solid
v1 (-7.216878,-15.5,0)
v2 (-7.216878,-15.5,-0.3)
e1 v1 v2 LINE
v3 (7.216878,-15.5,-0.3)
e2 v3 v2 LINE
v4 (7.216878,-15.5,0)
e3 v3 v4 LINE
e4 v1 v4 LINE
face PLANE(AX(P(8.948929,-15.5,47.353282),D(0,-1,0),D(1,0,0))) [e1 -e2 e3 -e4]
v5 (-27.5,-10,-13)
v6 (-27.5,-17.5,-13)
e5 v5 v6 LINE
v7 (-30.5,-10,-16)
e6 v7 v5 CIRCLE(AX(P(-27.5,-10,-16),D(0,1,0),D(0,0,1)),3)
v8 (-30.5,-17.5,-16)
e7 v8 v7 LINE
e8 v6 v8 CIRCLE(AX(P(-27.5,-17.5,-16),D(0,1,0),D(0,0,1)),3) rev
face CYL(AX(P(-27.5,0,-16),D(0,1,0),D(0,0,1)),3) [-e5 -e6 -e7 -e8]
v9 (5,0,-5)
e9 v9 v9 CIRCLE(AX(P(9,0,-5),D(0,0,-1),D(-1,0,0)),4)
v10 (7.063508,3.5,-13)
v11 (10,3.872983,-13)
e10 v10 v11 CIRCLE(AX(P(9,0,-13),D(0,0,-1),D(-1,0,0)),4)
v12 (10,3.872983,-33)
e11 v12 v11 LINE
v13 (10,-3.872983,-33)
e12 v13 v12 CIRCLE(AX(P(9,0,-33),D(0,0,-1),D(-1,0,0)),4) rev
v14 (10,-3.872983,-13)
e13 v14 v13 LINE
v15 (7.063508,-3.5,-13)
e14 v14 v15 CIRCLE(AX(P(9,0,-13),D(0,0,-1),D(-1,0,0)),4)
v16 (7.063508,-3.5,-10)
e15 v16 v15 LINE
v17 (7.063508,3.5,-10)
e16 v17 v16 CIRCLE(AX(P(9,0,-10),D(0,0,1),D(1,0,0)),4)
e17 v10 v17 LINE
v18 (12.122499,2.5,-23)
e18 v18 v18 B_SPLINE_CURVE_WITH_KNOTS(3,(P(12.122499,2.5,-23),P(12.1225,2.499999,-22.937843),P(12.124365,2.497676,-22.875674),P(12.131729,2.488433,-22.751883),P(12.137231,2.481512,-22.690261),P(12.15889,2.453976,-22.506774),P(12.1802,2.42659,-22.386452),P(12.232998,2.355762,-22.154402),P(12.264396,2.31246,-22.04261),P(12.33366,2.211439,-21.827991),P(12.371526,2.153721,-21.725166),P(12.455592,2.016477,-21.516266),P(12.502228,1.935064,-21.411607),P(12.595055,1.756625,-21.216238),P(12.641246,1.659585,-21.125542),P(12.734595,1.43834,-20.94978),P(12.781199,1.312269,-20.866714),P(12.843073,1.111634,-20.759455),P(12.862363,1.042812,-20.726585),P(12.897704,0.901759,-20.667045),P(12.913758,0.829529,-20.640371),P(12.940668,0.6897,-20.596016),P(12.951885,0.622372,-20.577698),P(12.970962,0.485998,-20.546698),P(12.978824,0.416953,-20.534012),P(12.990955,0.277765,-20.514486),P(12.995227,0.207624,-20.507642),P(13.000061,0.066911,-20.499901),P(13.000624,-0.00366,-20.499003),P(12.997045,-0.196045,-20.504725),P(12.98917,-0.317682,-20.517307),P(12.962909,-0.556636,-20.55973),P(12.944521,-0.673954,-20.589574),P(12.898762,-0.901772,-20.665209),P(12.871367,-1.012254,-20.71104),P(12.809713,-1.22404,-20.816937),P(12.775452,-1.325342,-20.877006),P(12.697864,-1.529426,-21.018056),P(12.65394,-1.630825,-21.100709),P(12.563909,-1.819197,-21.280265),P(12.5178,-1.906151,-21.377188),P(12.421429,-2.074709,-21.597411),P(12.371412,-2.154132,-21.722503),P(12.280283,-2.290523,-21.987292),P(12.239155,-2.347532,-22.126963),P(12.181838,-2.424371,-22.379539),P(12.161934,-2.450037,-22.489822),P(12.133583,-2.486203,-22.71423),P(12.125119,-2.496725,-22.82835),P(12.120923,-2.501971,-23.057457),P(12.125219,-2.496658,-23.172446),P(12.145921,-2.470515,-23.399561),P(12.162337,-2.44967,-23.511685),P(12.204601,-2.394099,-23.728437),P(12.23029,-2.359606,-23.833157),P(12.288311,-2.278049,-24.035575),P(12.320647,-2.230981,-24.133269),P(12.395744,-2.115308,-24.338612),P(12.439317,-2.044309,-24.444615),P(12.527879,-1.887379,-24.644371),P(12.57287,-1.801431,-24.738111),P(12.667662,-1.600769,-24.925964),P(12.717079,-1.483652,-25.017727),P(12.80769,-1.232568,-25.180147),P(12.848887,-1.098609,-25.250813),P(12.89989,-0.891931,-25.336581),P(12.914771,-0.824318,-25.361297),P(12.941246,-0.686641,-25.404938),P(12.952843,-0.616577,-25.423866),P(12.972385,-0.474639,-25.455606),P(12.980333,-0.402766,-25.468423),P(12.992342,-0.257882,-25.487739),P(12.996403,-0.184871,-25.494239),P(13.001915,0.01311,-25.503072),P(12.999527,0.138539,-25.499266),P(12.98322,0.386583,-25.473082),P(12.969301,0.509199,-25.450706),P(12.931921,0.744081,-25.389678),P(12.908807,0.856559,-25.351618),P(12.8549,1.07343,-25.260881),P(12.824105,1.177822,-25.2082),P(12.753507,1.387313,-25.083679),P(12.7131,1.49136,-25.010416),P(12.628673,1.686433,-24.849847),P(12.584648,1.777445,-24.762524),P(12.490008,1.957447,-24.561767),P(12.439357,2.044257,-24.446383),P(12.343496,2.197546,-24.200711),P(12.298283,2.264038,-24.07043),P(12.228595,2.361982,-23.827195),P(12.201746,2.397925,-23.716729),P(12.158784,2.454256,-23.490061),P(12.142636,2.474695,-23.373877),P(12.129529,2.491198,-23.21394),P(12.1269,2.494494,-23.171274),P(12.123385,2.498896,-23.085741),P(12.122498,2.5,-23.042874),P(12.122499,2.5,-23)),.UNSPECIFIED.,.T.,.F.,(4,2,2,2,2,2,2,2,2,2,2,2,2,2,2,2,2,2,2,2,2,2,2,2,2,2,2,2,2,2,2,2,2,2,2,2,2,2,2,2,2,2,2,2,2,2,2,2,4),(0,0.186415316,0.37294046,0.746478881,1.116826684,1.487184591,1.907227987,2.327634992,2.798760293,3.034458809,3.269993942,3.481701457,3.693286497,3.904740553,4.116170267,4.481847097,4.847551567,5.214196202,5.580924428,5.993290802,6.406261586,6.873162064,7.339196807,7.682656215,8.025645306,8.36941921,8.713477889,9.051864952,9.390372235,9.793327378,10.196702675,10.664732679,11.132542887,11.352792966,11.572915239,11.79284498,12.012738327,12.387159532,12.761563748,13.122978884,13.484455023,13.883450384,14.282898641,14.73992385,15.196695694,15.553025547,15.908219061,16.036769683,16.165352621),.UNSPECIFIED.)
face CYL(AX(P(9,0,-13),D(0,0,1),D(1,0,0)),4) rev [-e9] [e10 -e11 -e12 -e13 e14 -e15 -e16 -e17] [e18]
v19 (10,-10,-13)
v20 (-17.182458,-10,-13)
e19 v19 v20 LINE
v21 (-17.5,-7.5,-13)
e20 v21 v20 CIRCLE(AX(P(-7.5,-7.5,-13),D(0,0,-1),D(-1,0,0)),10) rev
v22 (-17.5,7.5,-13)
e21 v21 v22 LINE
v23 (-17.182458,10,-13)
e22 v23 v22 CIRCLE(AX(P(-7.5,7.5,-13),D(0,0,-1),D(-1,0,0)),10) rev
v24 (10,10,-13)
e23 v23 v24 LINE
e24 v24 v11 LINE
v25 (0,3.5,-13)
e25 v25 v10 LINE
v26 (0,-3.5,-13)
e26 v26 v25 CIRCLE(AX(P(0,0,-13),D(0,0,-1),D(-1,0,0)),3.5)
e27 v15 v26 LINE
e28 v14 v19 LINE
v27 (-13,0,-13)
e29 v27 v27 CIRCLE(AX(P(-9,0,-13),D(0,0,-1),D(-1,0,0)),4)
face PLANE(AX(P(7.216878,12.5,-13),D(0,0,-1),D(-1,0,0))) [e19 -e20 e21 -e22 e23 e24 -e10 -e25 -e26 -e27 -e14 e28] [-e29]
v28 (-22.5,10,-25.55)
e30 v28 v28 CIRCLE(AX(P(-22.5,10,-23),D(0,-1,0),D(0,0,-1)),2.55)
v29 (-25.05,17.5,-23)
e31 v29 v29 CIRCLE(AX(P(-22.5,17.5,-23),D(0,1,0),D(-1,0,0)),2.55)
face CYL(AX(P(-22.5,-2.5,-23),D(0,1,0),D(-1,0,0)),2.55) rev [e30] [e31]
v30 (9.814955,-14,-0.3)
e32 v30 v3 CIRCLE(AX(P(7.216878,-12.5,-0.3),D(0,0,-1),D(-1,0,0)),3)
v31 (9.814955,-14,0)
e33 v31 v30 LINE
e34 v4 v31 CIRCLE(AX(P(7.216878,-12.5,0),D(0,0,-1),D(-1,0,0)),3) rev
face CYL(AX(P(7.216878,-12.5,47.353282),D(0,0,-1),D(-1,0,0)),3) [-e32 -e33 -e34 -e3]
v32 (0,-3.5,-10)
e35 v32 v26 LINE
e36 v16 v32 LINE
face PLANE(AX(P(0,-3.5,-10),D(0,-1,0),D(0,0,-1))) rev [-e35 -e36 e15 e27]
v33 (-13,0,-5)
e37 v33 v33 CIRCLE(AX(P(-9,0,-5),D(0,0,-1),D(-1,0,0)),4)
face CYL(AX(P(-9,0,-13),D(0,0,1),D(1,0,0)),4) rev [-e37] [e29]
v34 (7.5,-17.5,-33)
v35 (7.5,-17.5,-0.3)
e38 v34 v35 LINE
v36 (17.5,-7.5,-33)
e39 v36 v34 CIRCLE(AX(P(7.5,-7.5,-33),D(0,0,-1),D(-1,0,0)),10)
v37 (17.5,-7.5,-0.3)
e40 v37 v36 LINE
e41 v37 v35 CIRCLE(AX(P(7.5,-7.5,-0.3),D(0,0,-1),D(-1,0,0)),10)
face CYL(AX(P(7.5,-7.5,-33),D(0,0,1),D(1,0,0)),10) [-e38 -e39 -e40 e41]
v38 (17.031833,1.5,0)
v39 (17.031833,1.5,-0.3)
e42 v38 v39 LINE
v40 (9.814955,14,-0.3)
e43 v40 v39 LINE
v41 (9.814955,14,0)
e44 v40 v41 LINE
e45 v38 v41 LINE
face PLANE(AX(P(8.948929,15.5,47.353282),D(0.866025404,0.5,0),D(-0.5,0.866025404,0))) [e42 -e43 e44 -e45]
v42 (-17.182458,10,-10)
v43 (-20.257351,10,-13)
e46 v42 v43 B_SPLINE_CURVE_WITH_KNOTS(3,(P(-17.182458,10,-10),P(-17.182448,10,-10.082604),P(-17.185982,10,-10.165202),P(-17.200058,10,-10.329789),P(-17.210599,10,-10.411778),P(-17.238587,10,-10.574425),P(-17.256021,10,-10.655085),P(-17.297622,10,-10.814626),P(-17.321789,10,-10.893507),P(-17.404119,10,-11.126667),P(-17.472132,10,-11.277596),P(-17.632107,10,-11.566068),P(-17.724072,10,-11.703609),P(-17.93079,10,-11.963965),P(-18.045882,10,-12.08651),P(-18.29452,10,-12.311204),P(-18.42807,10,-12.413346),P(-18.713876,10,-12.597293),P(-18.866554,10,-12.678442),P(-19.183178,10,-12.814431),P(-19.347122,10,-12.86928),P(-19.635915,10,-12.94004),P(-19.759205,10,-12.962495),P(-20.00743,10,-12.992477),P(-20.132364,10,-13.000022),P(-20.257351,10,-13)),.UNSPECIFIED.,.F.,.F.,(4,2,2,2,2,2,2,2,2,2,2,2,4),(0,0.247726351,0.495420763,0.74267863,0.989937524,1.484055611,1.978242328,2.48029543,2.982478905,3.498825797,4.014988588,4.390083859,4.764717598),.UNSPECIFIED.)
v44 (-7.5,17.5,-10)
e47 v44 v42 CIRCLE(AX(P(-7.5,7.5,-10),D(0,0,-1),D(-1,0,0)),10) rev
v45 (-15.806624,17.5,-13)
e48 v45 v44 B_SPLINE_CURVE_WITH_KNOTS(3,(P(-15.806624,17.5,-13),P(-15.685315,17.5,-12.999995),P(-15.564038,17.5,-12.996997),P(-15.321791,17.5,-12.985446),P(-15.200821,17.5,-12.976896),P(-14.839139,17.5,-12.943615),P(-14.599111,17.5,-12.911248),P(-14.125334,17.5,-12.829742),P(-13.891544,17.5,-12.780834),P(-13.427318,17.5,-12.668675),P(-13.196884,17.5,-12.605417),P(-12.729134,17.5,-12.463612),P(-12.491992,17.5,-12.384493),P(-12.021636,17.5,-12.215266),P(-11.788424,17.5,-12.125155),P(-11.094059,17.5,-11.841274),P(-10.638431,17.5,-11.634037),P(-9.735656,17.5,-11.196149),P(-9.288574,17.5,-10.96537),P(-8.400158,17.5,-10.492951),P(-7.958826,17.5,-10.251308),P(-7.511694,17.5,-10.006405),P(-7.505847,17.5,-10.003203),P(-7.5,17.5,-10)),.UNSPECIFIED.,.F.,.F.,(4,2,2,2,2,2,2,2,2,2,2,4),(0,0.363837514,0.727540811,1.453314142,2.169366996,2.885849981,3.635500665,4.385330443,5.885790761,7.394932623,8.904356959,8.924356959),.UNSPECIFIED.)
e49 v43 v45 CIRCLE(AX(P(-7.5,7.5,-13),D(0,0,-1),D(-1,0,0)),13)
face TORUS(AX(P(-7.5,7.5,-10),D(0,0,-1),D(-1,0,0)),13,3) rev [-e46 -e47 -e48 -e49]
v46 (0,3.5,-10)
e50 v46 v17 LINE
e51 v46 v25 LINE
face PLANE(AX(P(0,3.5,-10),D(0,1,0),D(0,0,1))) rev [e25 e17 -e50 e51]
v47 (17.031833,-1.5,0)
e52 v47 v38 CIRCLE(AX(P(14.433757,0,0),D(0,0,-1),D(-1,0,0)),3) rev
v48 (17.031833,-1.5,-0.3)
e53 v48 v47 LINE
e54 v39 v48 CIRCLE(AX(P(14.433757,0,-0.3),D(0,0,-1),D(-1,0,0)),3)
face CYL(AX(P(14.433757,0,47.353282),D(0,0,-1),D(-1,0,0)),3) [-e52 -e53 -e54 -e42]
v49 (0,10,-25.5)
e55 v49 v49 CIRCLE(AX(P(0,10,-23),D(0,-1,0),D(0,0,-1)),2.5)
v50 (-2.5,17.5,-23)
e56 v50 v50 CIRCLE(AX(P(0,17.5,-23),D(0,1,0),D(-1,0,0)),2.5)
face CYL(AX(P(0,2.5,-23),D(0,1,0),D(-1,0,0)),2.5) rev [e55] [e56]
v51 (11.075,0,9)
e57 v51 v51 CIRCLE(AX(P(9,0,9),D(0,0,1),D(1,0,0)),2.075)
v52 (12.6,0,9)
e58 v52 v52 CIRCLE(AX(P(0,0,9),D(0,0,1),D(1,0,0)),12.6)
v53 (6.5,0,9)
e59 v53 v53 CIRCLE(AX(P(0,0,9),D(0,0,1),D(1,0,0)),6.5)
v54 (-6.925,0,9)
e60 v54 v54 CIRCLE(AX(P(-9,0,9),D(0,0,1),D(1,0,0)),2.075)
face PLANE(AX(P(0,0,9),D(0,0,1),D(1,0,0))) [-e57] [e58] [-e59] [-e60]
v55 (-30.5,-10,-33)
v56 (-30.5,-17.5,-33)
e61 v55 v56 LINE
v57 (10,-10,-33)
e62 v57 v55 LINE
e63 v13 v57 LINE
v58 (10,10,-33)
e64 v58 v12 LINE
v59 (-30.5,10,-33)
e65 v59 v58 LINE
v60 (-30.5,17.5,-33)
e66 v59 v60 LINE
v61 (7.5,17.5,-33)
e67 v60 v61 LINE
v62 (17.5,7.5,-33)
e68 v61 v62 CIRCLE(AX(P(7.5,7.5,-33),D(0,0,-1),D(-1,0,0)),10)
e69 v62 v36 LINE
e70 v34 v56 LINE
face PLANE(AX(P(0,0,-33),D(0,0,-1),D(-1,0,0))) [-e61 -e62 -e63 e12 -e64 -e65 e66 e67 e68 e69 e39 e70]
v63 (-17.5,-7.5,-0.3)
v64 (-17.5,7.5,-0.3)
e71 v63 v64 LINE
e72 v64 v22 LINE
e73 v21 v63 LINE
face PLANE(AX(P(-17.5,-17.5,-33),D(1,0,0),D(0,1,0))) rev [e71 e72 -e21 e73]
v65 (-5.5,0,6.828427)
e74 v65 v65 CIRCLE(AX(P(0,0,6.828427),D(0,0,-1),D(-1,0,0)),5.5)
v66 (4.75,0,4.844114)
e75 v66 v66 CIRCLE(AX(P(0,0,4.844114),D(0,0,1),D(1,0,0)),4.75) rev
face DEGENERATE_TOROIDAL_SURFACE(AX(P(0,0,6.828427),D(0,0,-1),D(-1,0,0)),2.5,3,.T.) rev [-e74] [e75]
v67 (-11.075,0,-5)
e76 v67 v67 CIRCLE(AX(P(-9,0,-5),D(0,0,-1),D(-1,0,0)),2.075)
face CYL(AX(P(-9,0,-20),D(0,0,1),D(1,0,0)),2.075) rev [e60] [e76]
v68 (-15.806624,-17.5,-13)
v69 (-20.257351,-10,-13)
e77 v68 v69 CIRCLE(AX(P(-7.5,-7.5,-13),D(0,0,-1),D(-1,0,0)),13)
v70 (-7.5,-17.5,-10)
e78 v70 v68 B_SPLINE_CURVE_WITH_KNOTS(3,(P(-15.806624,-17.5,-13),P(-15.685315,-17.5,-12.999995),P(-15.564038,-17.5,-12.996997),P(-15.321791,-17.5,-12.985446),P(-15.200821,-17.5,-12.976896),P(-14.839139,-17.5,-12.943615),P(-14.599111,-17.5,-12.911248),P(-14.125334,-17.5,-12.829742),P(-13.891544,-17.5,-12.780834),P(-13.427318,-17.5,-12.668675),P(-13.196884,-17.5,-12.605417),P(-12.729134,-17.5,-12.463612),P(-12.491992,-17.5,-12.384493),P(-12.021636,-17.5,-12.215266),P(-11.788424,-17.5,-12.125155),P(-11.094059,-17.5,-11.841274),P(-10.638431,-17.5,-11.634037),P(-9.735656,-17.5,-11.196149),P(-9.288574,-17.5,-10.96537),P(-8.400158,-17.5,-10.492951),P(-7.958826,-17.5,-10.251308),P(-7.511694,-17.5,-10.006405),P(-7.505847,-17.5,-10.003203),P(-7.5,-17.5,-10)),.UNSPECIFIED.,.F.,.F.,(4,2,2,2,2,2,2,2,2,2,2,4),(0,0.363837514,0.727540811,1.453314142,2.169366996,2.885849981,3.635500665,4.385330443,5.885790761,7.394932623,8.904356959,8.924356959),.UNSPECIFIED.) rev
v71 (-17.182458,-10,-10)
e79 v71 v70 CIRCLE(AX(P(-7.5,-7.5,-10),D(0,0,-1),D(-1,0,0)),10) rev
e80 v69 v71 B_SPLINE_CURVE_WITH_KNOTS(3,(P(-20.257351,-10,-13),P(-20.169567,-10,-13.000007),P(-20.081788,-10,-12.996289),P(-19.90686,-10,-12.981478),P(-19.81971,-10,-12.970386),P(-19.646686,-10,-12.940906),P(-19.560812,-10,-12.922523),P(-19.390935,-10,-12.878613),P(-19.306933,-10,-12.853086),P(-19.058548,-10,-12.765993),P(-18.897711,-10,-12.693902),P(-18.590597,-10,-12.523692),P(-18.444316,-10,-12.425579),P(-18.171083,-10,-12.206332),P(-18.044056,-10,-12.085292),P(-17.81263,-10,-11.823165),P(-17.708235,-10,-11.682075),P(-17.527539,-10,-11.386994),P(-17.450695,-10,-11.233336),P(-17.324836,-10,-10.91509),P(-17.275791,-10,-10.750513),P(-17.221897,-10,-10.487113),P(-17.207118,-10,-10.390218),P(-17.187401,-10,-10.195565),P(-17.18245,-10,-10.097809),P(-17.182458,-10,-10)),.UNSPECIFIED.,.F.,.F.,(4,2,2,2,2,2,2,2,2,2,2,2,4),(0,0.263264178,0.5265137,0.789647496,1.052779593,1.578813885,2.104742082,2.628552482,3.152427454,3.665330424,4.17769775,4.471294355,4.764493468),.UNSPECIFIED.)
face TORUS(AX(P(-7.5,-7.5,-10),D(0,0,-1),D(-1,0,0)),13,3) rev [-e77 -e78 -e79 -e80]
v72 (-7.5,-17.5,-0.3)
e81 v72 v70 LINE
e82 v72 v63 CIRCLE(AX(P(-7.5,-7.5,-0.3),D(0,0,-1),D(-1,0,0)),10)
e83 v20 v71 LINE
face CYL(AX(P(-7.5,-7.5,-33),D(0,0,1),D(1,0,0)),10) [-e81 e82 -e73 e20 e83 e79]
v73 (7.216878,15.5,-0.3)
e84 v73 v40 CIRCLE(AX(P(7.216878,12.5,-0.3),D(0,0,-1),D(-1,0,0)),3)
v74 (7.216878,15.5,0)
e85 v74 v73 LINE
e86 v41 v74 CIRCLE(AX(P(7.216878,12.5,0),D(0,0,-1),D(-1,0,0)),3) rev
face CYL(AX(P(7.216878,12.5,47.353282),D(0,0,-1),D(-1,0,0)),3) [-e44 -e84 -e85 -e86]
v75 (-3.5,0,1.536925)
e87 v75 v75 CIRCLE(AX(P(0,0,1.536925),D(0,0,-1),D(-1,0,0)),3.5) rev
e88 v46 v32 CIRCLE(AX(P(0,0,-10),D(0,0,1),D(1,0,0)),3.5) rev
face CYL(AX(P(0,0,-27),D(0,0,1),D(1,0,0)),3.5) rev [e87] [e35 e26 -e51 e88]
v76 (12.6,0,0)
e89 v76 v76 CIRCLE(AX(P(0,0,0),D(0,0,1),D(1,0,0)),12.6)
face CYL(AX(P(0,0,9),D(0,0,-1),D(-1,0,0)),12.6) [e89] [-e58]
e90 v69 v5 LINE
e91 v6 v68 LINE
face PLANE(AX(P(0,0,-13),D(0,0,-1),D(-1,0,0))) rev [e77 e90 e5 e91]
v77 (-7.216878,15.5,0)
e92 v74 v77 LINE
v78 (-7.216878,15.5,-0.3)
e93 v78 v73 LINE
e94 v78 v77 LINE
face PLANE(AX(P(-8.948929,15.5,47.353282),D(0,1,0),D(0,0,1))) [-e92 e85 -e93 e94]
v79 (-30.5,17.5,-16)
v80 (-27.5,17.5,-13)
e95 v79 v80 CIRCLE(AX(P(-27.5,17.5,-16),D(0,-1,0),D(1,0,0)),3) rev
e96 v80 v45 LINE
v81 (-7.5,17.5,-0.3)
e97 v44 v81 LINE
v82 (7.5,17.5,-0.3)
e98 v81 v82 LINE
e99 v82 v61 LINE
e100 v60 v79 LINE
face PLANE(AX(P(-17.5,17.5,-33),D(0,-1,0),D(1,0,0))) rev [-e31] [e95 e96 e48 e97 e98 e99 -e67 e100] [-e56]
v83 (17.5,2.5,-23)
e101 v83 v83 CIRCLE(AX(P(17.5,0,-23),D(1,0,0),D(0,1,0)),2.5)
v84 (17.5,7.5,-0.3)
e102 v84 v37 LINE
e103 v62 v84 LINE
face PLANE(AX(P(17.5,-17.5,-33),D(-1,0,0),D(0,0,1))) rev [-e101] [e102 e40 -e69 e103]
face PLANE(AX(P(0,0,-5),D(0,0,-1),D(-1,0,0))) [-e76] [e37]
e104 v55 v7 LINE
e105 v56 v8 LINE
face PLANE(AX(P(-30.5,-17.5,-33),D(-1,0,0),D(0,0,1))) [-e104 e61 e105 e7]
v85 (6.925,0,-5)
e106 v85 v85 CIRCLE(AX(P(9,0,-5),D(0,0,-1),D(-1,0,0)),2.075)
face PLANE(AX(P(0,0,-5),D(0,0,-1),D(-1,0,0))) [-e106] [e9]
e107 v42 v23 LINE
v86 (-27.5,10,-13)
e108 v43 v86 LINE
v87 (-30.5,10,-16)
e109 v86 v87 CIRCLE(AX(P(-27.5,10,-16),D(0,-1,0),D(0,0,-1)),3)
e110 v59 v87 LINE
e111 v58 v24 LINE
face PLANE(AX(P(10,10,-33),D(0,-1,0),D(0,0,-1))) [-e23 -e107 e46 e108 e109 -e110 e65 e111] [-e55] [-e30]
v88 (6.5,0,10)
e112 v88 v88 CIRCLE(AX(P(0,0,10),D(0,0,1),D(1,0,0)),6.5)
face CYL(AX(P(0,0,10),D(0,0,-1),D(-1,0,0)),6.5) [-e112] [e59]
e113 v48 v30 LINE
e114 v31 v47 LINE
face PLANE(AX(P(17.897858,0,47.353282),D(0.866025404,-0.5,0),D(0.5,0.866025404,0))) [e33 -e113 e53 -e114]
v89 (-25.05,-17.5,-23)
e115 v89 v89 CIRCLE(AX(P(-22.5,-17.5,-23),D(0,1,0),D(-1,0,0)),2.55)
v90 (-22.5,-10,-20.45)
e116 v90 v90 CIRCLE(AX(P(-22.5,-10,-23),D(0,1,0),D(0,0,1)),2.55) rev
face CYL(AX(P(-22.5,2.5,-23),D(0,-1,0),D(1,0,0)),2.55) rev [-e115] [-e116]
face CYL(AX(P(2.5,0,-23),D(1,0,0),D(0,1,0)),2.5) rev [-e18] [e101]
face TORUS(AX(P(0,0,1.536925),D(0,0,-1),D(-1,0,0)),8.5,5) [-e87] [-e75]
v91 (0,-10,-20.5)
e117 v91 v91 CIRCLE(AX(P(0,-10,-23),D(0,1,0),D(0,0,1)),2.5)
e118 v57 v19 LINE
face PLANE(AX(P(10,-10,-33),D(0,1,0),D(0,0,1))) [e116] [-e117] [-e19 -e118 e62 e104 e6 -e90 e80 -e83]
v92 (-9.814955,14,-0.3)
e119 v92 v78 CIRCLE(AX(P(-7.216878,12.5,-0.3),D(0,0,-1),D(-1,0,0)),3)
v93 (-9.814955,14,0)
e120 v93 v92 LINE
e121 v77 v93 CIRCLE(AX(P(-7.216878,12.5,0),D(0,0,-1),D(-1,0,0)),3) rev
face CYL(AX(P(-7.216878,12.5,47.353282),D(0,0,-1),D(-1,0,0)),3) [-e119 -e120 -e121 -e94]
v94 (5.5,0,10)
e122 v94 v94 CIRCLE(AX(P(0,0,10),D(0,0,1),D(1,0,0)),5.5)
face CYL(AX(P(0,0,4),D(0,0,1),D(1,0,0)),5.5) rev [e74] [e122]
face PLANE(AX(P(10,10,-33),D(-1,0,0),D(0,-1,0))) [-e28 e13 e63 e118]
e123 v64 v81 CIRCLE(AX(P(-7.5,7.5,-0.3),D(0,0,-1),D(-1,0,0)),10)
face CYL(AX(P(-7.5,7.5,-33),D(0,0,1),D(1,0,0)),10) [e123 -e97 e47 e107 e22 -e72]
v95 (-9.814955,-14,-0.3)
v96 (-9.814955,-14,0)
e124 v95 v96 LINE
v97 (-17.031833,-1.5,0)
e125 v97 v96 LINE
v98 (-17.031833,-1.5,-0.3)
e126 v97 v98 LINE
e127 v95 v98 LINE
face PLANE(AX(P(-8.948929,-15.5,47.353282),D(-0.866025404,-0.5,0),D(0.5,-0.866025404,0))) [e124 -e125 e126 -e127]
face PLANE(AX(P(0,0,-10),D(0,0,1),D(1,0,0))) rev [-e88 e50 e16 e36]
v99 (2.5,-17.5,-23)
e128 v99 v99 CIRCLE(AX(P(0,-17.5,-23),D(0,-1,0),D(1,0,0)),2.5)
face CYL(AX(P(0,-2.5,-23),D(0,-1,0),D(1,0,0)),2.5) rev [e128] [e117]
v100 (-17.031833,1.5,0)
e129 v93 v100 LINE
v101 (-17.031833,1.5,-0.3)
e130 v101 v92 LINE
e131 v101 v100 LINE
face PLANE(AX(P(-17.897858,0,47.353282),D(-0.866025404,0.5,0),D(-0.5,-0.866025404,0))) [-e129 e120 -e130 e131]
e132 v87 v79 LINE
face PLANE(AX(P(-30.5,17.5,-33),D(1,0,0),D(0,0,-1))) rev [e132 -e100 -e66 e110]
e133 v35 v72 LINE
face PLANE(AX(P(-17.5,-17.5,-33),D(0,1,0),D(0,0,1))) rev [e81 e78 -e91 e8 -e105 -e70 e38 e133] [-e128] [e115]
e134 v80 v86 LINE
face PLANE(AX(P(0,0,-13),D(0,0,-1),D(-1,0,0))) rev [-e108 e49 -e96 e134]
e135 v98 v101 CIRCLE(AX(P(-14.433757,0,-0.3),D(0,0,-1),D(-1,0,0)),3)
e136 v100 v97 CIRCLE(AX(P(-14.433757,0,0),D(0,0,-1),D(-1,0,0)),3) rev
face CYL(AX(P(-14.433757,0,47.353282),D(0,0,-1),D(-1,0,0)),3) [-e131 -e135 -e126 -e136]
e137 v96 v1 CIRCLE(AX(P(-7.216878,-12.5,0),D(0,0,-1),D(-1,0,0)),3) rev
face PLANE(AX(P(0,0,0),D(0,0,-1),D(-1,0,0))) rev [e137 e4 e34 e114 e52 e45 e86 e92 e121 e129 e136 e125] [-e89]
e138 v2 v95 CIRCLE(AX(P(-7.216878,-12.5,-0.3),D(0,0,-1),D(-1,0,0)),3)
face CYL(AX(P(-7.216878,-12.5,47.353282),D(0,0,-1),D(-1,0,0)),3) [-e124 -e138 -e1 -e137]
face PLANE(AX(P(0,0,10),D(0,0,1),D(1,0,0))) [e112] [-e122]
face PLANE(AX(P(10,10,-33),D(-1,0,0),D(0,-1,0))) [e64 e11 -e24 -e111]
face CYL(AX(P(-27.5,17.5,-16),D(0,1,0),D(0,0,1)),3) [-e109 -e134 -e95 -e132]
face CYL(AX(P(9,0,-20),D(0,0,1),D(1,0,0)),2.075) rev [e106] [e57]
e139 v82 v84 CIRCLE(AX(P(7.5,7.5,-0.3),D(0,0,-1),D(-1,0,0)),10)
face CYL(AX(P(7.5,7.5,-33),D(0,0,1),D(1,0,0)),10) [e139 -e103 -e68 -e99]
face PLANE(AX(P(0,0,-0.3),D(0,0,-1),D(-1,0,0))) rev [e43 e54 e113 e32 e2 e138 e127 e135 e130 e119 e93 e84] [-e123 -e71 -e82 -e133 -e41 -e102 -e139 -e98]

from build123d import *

# Parameters (mm, degrees)
SKETCH_1_R               = 12.6
EXTRUDE_1_DEPTH          = 9
SKETCH_2_R               = 15
EXTRUDE_2_DEPTH          = 5
SKETCH_3_R               = 5.5
CUT_EXTRUDE_1_DEPTH      = 5
SKETCH_4_R               = 2.075
CUT_EXTRUDE_2_DEPTH      = 29
SKETCH_5_R               = 3.5
CUT_EXTRUDE_3_DEPTH      = 31
FILLET_1_R               = 3
FILLET_2_R               = 5
EXTRUDE_START            = 1
SKETCH_6_R               = 6.5
SKETCH_6_R_2             = 5.5
EXTRUDE_1_2_DEPTH        = 1
EXTRUDE_START_2          = -5
SKETCH_7_R               = 15
EXTRUDE_3_DEPTH          = 5
FILLET_3_R               = 3
EXTRUDE_START_3          = 8
SKETCH_8_R               = 3.5
SKETCH_8_R_2             = 4
EXTRUDE_4_DEPTH          = 8
SKETCH_9_W               = 35
SKETCH_9_H               = 35
SKETCH_9_W_2             = 20
SKETCH_9_H_2             = 20
EXTRUDE_5_DEPTH          = 20
SKETCH_10_W              = 35
SKETCH_10_H              = 35
EXTRUDE_6_DEPTH          = 8.5
FILLET_4_R               = 10
SKETCH_11_R              = 2.5
CUT_EXTRUDE_4_DEPTH      = 15
PATTERN_CIRCULAR_1_COUNT = 4
CUT_EXTRUDE_START        = 83
SKETCH_12_R              = 4
CUT_EXTRUDE_5_DEPTH      = 83
SKETCH_14_W              = 23.212780374
SKETCH_14_H              = 20
CUT_EXTRUDE_6_DEPTH      = 41
EXTRUDE_7_DEPTH          = 1.3
SKETCH_16_W              = 9.986830102
SKETCH_16_H              = 7
CUT_EXTRUDE_7_DEPTH      = 3
SKETCH_18_W              = 23
SKETCH_18_H              = 7.5
EXTRUDE_8_DEPTH          = 20
SKETCH_19_R              = 2.55
CUT_EXTRUDE_8_DEPTH      = 20
FILLET_8_R               = 3
FILLET_9_R               = 3
EXTRUDE_9_DEPTH          = 2.9


with BuildPart() as part:
    # 草图1 → Extrude 1 (new body)
    with BuildSketch(Plane.XY):
        Circle(SKETCH_1_R)
    extrude(amount=EXTRUDE_1_DEPTH)

    # 草图2 → 凸台-拉伸2 (add)
    with BuildSketch(Plane(origin=(0, 0, 0), x_dir=(-1, 0, 0), z_dir=(0, 0, -1))):
        Circle(SKETCH_2_R)
    extrude(amount=EXTRUDE_2_DEPTH)

    # 草图3 → Cut-Extrude 1 (cut)
    with BuildSketch(Plane.XY.offset(9)):
        Circle(SKETCH_3_R)
    extrude(amount=-CUT_EXTRUDE_1_DEPTH, mode=Mode.SUBTRACT)

    # 草图4 → 切除-拉伸2 (cut)
    with BuildSketch(Plane.XY.offset(9)):
        with Locations((-9, 0)):
            Circle(SKETCH_4_R)
        with Locations((9, 0)):
            Circle(SKETCH_4_R)
    extrude(amount=-CUT_EXTRUDE_2_DEPTH, mode=Mode.SUBTRACT)

    # 草图5 → 切除-拉伸3 (cut)
    with BuildSketch(Plane.XY.offset(4)):
        Circle(SKETCH_5_R)
    extrude(amount=-CUT_EXTRUDE_3_DEPTH, mode=Mode.SUBTRACT)

    # 圆角1
    # the kernel refuses this fillet: 3 mm, written as the material it adds along each edge
    with BuildSketch(Plane(origin=(0, 0, 4), x_dir=(1, 0, 0), z_dir=(0, -1, 0))) as fillet_1_piece_1:
        with BuildLine():
            CenterArc((2.5, 2.828427125), FILLET_1_R, 289.471220634, 70.528779366)
            Line((5.5, 2.828427125), (5.56, 2.828427125))
            Line((5.56, 2.828427125), (5.56, 0))
            Line((5.56, 0), (5.5, -0.06))
            ThreePointArc((5.5, -0.06), (4.5, -0.06), (3.52, -0.056568542))
            Line((3.52, -0.056568542), (3.5, 0))
        make_face()
    revolve(axis=Axis((0, 0, 4), (0, 0, 1)))

    # 圆角2
    fillet_2_edges = [part.edges().sort_by_distance(p)[0] for p in [
        (-3.5, 0, 4),
    ]]
    fillet(fillet_2_edges, radius=FILLET_2_R)

    # 草图6 → Extrude 1 2 (add)
    with BuildSketch(Plane.XY.offset(9).offset(EXTRUDE_START)):
        Circle(SKETCH_6_R)
        Circle(SKETCH_6_R_2, mode=Mode.SUBTRACT)
    extrude(amount=-EXTRUDE_1_2_DEPTH)

    # 草图7 → 凸台-拉伸3 (add)
    with BuildSketch(Plane(origin=(0, 0, -5), x_dir=(-1, 0, 0), z_dir=(0, 0, -1)).offset(EXTRUDE_START_2)):
        Polygon((-8.948929172, 15.5), (-17.897858345, 0), (-8.948929172, -15.5), (8.948929172, -15.5), (17.897858345, 0), (8.948929172, 15.5), align=None)
        Circle(SKETCH_7_R, mode=Mode.SUBTRACT)
    extrude(amount=EXTRUDE_3_DEPTH)

    # 圆角3
    fillet_3_edges = [part.edges().sort_by_distance(p)[0] for p in [
        (17.897858345, 0, -2.5),
        (8.948929172, -15.5, -2.5),
        (-8.948929172, -15.5, -2.5),
        (-17.897858345, 0, -2.5),
        (-8.948929172, 15.5, -2.5),
        (8.948929172, 15.5, -2.5),
    ]]
    fillet(fillet_3_edges, radius=FILLET_3_R)

    # 草图8 → 凸台-拉伸4 (add)
    with BuildSketch(Plane(origin=(0, 0, -5), x_dir=(-1, 0, 0), z_dir=(0, 0, -1)).offset(EXTRUDE_START_3)):
        with BuildLine():
            Line((-9.814954576, 14), (-17.031832941, 1.5))
            ThreePointArc((-17.031832941, 1.5), (-17.43375673, 0), (-17.031832941, -1.5))
            Line((-17.031832941, -1.5), (-9.814954576, -14))
            ThreePointArc((-9.814954576, -14), (-8.716878365, -15.098076211), (-7.216878365, -15.5))
            Line((-7.216878365, -15.5), (7.216878365, -15.5))
            ThreePointArc((7.216878365, -15.5), (8.716878365, -15.098076211), (9.814954576, -14))
            Line((9.814954576, -14), (17.031832941, -1.5))
            ThreePointArc((17.031832941, -1.5), (17.43375673, 0), (17.031832941, 1.5))
            Line((17.031832941, 1.5), (9.814954576, 14))
            ThreePointArc((9.814954576, 14), (8.716878365, 15.098076211), (7.216878365, 15.5))
            Line((7.216878365, 15.5), (-7.216878365, 15.5))
            ThreePointArc((-7.216878365, 15.5), (-8.716878365, 15.098076211), (-9.814954576, 14))
        make_face()
        Circle(SKETCH_8_R, mode=Mode.SUBTRACT)
        with Locations((-9, 0)):
            Circle(SKETCH_8_R_2, mode=Mode.SUBTRACT)
        with Locations((9, 0)):
            Circle(SKETCH_8_R_2, mode=Mode.SUBTRACT)
    extrude(amount=-EXTRUDE_4_DEPTH)

    # 草图9 → 凸台-拉伸5 (add)
    with BuildSketch(Plane(origin=(0, 0, -13), x_dir=(-1, 0, 0), z_dir=(0, 0, -1))):
        Rectangle(SKETCH_9_W, SKETCH_9_H)
        Rectangle(SKETCH_9_W_2, SKETCH_9_H_2, mode=Mode.SUBTRACT)
    extrude(amount=EXTRUDE_5_DEPTH)

    # 草图10 → 凸台-拉伸6 (add)
    with BuildSketch(Plane.XY.offset(-13)):
        Rectangle(SKETCH_10_W, SKETCH_10_H)
        with BuildLine():
            Line((7.216878365, 15.5), (-7.216878365, 15.5))
            ThreePointArc((-7.216878365, 15.5), (-8.716878365, 15.098076211), (-9.814954576, 14))
            Line((-9.814954576, 14), (-17.031832941, 1.5))
            ThreePointArc((-17.031832941, 1.5), (-17.43375673, 0), (-17.031832941, -1.5))
            Line((-17.031832941, -1.5), (-9.814954576, -14))
            ThreePointArc((-9.814954576, -14), (-8.716878365, -15.098076211), (-7.216878365, -15.5))
            Line((-7.216878365, -15.5), (7.216878365, -15.5))
            ThreePointArc((7.216878365, -15.5), (8.716878365, -15.098076211), (9.814954576, -14))
            Line((9.814954576, -14), (17.031832941, -1.5))
            ThreePointArc((17.031832941, -1.5), (17.43375673, 0), (17.031832941, 1.5))
            Line((17.031832941, 1.5), (9.814954576, 14))
            ThreePointArc((9.814954576, 14), (8.716878365, 15.098076211), (7.216878365, 15.5))
        make_face(mode=Mode.SUBTRACT)
    extrude(amount=EXTRUDE_6_DEPTH)

    # 圆角4
    fillet_4_edges = [part.edges().sort_by_distance(p)[0] for p in [
        (17.5, 17.5, -18.75),
        (17.5, -17.5, -18.75),
        (-17.5, -17.5, -18.75),
        (-17.5, 17.5, -18.75),
    ]]
    fillet(fillet_4_edges, radius=FILLET_4_R)

    # 草图11 → 切除-拉伸4 (cut)
    with BuildSketch(Plane.ZY.offset(17.5)):
        with Locations(Location((-23, 0, 0), (0, 0, 270))):
            Circle(SKETCH_11_R)
    cut_extrude_4 = extrude(amount=-CUT_EXTRUDE_4_DEPTH, mode=Mode.SUBTRACT)

    # 阵列(圆周)1: 切除-拉伸4 ×4 about axis
    pattern_circular_1_axis = Axis((0, 0, -27), (0, 0, 1))
    for i in range(1, PATTERN_CIRCULAR_1_COUNT):
        add(cut_extrude_4.rotate(pattern_circular_1_axis, i * 360 / PATTERN_CIRCULAR_1_COUNT), mode=Mode.SUBTRACT)

    # 草图12 → 切除-拉伸5 (cut)
    with BuildSketch(Plane(origin=(0, 0, -5), x_dir=(-1, 0, 0), z_dir=(0, 0, -1)).offset(CUT_EXTRUDE_START)):
        with Locations(Location((9, 0, 0), (0, 0, 75.522487814))):
            Circle(SKETCH_12_R)
        with Locations(Location((-9, 0, 0), (0, 0, 255.522487814))):
            Circle(SKETCH_12_R)
    extrude(amount=-CUT_EXTRUDE_5_DEPTH, mode=Mode.SUBTRACT)

    # 草图14 → 切除-拉伸6 (cut)
    with BuildSketch(Plane(origin=(0, 0, -13), x_dir=(-1, 0, 0), z_dir=(0, 0, -1))):
        with Locations((21.606390187, 0)):
            Rectangle(SKETCH_14_W, SKETCH_14_H)
    extrude(amount=CUT_EXTRUDE_6_DEPTH, mode=Mode.SUBTRACT)

    # 草图15 → 凸台-拉伸7 (add)
    with BuildSketch(Plane.XY.offset(-4.5)):
        with BuildLine():
            Line((7.5, 17.5), (-7.5, 17.5))
            ThreePointArc((-7.5, 17.5), (-14.571067812, 14.571067812), (-17.5, 7.5))
            Line((-17.5, 7.5), (-17.5, -7.5))
            ThreePointArc((-17.5, -7.5), (-14.571067812, -14.571067812), (-7.5, -17.5))
            Line((-7.5, -17.5), (7.5, -17.5))
            ThreePointArc((7.5, -17.5), (14.571067812, -14.571067812), (17.5, -7.5))
            Line((17.5, -7.5), (17.5, 7.5))
            ThreePointArc((17.5, 7.5), (14.571067812, 14.571067812), (7.5, 17.5))
        make_face()
        with BuildLine():
            Line((9.814954576, -14), (17.031832941, -1.5))
            ThreePointArc((17.031832941, -1.5), (17.43375673, 0), (17.031832941, 1.5))
            Line((17.031832941, 1.5), (9.814954576, 14))
            ThreePointArc((9.814954576, 14), (8.716878365, 15.098076211), (7.216878365, 15.5))
            Line((7.216878365, 15.5), (-7.216878365, 15.5))
            ThreePointArc((-7.216878365, 15.5), (-8.716878365, 15.098076211), (-9.814954576, 14))
            Line((-9.814954576, 14), (-17.031832941, 1.5))
            ThreePointArc((-17.031832941, 1.5), (-17.43375673, 0), (-17.031832941, -1.5))
            Line((-17.031832941, -1.5), (-9.814954576, -14))
            ThreePointArc((-9.814954576, -14), (-8.716878365, -15.098076211), (-7.216878365, -15.5))
            Line((-7.216878365, -15.5), (7.216878365, -15.5))
            ThreePointArc((7.216878365, -15.5), (8.716878365, -15.098076211), (9.814954576, -14))
        make_face(mode=Mode.SUBTRACT)
    extrude(amount=EXTRUDE_7_DEPTH)

    # 草图16 → 切除-拉伸7 (cut)
    with BuildSketch(Plane(origin=(0, 0, -13), x_dir=(-1, 0, 0), z_dir=(0, 0, -1))):
        with Locations((-4.993415051, 0)):
            Rectangle(SKETCH_16_W, SKETCH_16_H)
    extrude(amount=-CUT_EXTRUDE_7_DEPTH, mode=Mode.SUBTRACT)

    # 草图18 → 凸台-拉伸8 (add)
    with BuildSketch(Plane(origin=(0, 0, -13), x_dir=(-1, 0, 0), z_dir=(0, 0, -1))):
        with Locations((19, 13.75)):
            Rectangle(SKETCH_18_W, SKETCH_18_H)
    extrude_8 = extrude(amount=EXTRUDE_8_DEPTH)

    # 草图19 → 切除-拉伸8 (cut)
    with BuildSketch(Plane(origin=(0, 17.5, 0), x_dir=(1, 0, 0), z_dir=(0, 1, 0))):
        with Locations(Location((-22.5, 23, 0), (0, 0, 180))):
            Circle(SKETCH_19_R)
    cut_extrude_8 = extrude(amount=-CUT_EXTRUDE_8_DEPTH, mode=Mode.SUBTRACT)

    # 镜向1: 凸台-拉伸8, 切除-拉伸8 across plane
    add(extrude_8.mirror(Plane.ZX))
    add(cut_extrude_8.mirror(Plane.ZX), mode=Mode.SUBTRACT)

    # 圆角8
    # the kernel refuses this fillet: 3 mm, written as the material it adds along each edge
    with BuildSketch(Plane(origin=(-7.5, 7.5, -13), x_dir=(0.6817939582921204, 0.7315442559656677, 0), z_dir=(0.7315442559656677, -0.6817939582921204, 0))) as fillet_8_piece_1_section:
        with BuildLine():
            CenterArc((10 + FILLET_8_R, FILLET_8_R), FILLET_8_R, 180, 90)
            Line((10, FILLET_8_R), (10, 0))
            Line((10, 0), (10 + FILLET_8_R, 0))
        make_face()
    fillet_8_piece_1 = revolve(axis=Axis((-7.5, 7.5, -13), (0, 0, 1)), revolution_arc=161.490465461, mode=Mode.PRIVATE)
    fillet_8_piece_1 = split(fillet_8_piece_1, bisect_by=Plane(origin=(-14.518222351, 17.5, -12.247981019), z_dir=(0, -1, 0)), keep=Keep.TOP, mode=Mode.PRIVATE)
    fillet_8_piece_1 = split(fillet_8_piece_1, bisect_by=Plane(origin=(-14.518222351, 10, -12.247981019), z_dir=(0, 1, 0)), keep=Keep.TOP, mode=Mode.PRIVATE)
    add(fillet_8_piece_1)
    with BuildSketch(Plane(origin=(-7.5, -7.5, -13), x_dir=(0.681793958292121, -0.7315442559656672, 0), z_dir=(0.7315442559656672, 0.681793958292121, 0))) as fillet_8_piece_2_section:
        with BuildLine():
            CenterArc((10 + FILLET_8_R, -FILLET_8_R), FILLET_8_R, 90, 90)
            Line((10, -FILLET_8_R), (10, 0))
            Line((10, 0), (10 + FILLET_8_R, 0))
        make_face()
    fillet_8_piece_2 = revolve(axis=Axis((-7.5, -7.5, -13), (0, 0, -1)), revolution_arc=161.490465461, mode=Mode.PRIVATE)
    fillet_8_piece_2 = split(fillet_8_piece_2, bisect_by=Plane(origin=(-14.518221596, -10, -12.247980438), z_dir=(0, -1, 0)), keep=Keep.TOP, mode=Mode.PRIVATE)
    fillet_8_piece_2 = split(fillet_8_piece_2, bisect_by=Plane(origin=(-14.518221596, -17.5, -12.247980438), z_dir=(0, 1, 0)), keep=Keep.TOP, mode=Mode.PRIVATE)
    add(fillet_8_piece_2)

    # 圆角9
    fillet_9_edges = [part.edges().sort_by_distance(p)[0] for p in [
        (-30.5, 13.75, -13),
        (-30.5, -13.75, -13),
    ]]
    fillet(fillet_9_edges, radius=FILLET_9_R)

    # 草图20 → 凸台-拉伸9 (add)
    with BuildSketch(Plane.XY.offset(-3.2)):
        with BuildLine():
            Line((7.5, 17.5), (-7.5, 17.5))
            ThreePointArc((-7.5, 17.5), (-14.571067812, 14.571067812), (-17.5, 7.5))
            Line((-17.5, 7.5), (-17.5, -7.5))
            ThreePointArc((-17.5, -7.5), (-14.571067812, -14.571067812), (-7.5, -17.5))
            Line((-7.5, -17.5), (7.5, -17.5))
            ThreePointArc((7.5, -17.5), (14.571067812, -14.571067812), (17.5, -7.5))
            Line((17.5, -7.5), (17.5, 7.5))
            ThreePointArc((17.5, 7.5), (14.571067812, 14.571067812), (7.5, 17.5))
        make_face()
        with BuildLine():
            Line((9.814954576, -14), (17.031832941, -1.5))
            ThreePointArc((17.031832941, -1.5), (17.43375673, 0), (17.031832941, 1.5))
            Line((17.031832941, 1.5), (9.814954576, 14))
            ThreePointArc((9.814954576, 14), (8.716878365, 15.098076211), (7.216878365, 15.5))
            Line((7.216878365, 15.5), (-7.216878365, 15.5))
            ThreePointArc((-7.216878365, 15.5), (-8.716878365, 15.098076211), (-9.814954576, 14))
            Line((-9.814954576, 14), (-17.031832941, 1.5))
            ThreePointArc((-17.031832941, 1.5), (-17.43375673, 0), (-17.031832941, -1.5))
            Line((-17.031832941, -1.5), (-9.814954576, -14))
            ThreePointArc((-9.814954576, -14), (-8.716878365, -15.098076211), (-7.216878365, -15.5))
            Line((-7.216878365, -15.5), (7.216878365, -15.5))
            ThreePointArc((7.216878365, -15.5), (8.716878365, -15.098076211), (9.814954576, -14))
        make_face(mode=Mode.SUBTRACT)
    extrude(amount=EXTRUDE_9_DEPTH)


solid = part.part
